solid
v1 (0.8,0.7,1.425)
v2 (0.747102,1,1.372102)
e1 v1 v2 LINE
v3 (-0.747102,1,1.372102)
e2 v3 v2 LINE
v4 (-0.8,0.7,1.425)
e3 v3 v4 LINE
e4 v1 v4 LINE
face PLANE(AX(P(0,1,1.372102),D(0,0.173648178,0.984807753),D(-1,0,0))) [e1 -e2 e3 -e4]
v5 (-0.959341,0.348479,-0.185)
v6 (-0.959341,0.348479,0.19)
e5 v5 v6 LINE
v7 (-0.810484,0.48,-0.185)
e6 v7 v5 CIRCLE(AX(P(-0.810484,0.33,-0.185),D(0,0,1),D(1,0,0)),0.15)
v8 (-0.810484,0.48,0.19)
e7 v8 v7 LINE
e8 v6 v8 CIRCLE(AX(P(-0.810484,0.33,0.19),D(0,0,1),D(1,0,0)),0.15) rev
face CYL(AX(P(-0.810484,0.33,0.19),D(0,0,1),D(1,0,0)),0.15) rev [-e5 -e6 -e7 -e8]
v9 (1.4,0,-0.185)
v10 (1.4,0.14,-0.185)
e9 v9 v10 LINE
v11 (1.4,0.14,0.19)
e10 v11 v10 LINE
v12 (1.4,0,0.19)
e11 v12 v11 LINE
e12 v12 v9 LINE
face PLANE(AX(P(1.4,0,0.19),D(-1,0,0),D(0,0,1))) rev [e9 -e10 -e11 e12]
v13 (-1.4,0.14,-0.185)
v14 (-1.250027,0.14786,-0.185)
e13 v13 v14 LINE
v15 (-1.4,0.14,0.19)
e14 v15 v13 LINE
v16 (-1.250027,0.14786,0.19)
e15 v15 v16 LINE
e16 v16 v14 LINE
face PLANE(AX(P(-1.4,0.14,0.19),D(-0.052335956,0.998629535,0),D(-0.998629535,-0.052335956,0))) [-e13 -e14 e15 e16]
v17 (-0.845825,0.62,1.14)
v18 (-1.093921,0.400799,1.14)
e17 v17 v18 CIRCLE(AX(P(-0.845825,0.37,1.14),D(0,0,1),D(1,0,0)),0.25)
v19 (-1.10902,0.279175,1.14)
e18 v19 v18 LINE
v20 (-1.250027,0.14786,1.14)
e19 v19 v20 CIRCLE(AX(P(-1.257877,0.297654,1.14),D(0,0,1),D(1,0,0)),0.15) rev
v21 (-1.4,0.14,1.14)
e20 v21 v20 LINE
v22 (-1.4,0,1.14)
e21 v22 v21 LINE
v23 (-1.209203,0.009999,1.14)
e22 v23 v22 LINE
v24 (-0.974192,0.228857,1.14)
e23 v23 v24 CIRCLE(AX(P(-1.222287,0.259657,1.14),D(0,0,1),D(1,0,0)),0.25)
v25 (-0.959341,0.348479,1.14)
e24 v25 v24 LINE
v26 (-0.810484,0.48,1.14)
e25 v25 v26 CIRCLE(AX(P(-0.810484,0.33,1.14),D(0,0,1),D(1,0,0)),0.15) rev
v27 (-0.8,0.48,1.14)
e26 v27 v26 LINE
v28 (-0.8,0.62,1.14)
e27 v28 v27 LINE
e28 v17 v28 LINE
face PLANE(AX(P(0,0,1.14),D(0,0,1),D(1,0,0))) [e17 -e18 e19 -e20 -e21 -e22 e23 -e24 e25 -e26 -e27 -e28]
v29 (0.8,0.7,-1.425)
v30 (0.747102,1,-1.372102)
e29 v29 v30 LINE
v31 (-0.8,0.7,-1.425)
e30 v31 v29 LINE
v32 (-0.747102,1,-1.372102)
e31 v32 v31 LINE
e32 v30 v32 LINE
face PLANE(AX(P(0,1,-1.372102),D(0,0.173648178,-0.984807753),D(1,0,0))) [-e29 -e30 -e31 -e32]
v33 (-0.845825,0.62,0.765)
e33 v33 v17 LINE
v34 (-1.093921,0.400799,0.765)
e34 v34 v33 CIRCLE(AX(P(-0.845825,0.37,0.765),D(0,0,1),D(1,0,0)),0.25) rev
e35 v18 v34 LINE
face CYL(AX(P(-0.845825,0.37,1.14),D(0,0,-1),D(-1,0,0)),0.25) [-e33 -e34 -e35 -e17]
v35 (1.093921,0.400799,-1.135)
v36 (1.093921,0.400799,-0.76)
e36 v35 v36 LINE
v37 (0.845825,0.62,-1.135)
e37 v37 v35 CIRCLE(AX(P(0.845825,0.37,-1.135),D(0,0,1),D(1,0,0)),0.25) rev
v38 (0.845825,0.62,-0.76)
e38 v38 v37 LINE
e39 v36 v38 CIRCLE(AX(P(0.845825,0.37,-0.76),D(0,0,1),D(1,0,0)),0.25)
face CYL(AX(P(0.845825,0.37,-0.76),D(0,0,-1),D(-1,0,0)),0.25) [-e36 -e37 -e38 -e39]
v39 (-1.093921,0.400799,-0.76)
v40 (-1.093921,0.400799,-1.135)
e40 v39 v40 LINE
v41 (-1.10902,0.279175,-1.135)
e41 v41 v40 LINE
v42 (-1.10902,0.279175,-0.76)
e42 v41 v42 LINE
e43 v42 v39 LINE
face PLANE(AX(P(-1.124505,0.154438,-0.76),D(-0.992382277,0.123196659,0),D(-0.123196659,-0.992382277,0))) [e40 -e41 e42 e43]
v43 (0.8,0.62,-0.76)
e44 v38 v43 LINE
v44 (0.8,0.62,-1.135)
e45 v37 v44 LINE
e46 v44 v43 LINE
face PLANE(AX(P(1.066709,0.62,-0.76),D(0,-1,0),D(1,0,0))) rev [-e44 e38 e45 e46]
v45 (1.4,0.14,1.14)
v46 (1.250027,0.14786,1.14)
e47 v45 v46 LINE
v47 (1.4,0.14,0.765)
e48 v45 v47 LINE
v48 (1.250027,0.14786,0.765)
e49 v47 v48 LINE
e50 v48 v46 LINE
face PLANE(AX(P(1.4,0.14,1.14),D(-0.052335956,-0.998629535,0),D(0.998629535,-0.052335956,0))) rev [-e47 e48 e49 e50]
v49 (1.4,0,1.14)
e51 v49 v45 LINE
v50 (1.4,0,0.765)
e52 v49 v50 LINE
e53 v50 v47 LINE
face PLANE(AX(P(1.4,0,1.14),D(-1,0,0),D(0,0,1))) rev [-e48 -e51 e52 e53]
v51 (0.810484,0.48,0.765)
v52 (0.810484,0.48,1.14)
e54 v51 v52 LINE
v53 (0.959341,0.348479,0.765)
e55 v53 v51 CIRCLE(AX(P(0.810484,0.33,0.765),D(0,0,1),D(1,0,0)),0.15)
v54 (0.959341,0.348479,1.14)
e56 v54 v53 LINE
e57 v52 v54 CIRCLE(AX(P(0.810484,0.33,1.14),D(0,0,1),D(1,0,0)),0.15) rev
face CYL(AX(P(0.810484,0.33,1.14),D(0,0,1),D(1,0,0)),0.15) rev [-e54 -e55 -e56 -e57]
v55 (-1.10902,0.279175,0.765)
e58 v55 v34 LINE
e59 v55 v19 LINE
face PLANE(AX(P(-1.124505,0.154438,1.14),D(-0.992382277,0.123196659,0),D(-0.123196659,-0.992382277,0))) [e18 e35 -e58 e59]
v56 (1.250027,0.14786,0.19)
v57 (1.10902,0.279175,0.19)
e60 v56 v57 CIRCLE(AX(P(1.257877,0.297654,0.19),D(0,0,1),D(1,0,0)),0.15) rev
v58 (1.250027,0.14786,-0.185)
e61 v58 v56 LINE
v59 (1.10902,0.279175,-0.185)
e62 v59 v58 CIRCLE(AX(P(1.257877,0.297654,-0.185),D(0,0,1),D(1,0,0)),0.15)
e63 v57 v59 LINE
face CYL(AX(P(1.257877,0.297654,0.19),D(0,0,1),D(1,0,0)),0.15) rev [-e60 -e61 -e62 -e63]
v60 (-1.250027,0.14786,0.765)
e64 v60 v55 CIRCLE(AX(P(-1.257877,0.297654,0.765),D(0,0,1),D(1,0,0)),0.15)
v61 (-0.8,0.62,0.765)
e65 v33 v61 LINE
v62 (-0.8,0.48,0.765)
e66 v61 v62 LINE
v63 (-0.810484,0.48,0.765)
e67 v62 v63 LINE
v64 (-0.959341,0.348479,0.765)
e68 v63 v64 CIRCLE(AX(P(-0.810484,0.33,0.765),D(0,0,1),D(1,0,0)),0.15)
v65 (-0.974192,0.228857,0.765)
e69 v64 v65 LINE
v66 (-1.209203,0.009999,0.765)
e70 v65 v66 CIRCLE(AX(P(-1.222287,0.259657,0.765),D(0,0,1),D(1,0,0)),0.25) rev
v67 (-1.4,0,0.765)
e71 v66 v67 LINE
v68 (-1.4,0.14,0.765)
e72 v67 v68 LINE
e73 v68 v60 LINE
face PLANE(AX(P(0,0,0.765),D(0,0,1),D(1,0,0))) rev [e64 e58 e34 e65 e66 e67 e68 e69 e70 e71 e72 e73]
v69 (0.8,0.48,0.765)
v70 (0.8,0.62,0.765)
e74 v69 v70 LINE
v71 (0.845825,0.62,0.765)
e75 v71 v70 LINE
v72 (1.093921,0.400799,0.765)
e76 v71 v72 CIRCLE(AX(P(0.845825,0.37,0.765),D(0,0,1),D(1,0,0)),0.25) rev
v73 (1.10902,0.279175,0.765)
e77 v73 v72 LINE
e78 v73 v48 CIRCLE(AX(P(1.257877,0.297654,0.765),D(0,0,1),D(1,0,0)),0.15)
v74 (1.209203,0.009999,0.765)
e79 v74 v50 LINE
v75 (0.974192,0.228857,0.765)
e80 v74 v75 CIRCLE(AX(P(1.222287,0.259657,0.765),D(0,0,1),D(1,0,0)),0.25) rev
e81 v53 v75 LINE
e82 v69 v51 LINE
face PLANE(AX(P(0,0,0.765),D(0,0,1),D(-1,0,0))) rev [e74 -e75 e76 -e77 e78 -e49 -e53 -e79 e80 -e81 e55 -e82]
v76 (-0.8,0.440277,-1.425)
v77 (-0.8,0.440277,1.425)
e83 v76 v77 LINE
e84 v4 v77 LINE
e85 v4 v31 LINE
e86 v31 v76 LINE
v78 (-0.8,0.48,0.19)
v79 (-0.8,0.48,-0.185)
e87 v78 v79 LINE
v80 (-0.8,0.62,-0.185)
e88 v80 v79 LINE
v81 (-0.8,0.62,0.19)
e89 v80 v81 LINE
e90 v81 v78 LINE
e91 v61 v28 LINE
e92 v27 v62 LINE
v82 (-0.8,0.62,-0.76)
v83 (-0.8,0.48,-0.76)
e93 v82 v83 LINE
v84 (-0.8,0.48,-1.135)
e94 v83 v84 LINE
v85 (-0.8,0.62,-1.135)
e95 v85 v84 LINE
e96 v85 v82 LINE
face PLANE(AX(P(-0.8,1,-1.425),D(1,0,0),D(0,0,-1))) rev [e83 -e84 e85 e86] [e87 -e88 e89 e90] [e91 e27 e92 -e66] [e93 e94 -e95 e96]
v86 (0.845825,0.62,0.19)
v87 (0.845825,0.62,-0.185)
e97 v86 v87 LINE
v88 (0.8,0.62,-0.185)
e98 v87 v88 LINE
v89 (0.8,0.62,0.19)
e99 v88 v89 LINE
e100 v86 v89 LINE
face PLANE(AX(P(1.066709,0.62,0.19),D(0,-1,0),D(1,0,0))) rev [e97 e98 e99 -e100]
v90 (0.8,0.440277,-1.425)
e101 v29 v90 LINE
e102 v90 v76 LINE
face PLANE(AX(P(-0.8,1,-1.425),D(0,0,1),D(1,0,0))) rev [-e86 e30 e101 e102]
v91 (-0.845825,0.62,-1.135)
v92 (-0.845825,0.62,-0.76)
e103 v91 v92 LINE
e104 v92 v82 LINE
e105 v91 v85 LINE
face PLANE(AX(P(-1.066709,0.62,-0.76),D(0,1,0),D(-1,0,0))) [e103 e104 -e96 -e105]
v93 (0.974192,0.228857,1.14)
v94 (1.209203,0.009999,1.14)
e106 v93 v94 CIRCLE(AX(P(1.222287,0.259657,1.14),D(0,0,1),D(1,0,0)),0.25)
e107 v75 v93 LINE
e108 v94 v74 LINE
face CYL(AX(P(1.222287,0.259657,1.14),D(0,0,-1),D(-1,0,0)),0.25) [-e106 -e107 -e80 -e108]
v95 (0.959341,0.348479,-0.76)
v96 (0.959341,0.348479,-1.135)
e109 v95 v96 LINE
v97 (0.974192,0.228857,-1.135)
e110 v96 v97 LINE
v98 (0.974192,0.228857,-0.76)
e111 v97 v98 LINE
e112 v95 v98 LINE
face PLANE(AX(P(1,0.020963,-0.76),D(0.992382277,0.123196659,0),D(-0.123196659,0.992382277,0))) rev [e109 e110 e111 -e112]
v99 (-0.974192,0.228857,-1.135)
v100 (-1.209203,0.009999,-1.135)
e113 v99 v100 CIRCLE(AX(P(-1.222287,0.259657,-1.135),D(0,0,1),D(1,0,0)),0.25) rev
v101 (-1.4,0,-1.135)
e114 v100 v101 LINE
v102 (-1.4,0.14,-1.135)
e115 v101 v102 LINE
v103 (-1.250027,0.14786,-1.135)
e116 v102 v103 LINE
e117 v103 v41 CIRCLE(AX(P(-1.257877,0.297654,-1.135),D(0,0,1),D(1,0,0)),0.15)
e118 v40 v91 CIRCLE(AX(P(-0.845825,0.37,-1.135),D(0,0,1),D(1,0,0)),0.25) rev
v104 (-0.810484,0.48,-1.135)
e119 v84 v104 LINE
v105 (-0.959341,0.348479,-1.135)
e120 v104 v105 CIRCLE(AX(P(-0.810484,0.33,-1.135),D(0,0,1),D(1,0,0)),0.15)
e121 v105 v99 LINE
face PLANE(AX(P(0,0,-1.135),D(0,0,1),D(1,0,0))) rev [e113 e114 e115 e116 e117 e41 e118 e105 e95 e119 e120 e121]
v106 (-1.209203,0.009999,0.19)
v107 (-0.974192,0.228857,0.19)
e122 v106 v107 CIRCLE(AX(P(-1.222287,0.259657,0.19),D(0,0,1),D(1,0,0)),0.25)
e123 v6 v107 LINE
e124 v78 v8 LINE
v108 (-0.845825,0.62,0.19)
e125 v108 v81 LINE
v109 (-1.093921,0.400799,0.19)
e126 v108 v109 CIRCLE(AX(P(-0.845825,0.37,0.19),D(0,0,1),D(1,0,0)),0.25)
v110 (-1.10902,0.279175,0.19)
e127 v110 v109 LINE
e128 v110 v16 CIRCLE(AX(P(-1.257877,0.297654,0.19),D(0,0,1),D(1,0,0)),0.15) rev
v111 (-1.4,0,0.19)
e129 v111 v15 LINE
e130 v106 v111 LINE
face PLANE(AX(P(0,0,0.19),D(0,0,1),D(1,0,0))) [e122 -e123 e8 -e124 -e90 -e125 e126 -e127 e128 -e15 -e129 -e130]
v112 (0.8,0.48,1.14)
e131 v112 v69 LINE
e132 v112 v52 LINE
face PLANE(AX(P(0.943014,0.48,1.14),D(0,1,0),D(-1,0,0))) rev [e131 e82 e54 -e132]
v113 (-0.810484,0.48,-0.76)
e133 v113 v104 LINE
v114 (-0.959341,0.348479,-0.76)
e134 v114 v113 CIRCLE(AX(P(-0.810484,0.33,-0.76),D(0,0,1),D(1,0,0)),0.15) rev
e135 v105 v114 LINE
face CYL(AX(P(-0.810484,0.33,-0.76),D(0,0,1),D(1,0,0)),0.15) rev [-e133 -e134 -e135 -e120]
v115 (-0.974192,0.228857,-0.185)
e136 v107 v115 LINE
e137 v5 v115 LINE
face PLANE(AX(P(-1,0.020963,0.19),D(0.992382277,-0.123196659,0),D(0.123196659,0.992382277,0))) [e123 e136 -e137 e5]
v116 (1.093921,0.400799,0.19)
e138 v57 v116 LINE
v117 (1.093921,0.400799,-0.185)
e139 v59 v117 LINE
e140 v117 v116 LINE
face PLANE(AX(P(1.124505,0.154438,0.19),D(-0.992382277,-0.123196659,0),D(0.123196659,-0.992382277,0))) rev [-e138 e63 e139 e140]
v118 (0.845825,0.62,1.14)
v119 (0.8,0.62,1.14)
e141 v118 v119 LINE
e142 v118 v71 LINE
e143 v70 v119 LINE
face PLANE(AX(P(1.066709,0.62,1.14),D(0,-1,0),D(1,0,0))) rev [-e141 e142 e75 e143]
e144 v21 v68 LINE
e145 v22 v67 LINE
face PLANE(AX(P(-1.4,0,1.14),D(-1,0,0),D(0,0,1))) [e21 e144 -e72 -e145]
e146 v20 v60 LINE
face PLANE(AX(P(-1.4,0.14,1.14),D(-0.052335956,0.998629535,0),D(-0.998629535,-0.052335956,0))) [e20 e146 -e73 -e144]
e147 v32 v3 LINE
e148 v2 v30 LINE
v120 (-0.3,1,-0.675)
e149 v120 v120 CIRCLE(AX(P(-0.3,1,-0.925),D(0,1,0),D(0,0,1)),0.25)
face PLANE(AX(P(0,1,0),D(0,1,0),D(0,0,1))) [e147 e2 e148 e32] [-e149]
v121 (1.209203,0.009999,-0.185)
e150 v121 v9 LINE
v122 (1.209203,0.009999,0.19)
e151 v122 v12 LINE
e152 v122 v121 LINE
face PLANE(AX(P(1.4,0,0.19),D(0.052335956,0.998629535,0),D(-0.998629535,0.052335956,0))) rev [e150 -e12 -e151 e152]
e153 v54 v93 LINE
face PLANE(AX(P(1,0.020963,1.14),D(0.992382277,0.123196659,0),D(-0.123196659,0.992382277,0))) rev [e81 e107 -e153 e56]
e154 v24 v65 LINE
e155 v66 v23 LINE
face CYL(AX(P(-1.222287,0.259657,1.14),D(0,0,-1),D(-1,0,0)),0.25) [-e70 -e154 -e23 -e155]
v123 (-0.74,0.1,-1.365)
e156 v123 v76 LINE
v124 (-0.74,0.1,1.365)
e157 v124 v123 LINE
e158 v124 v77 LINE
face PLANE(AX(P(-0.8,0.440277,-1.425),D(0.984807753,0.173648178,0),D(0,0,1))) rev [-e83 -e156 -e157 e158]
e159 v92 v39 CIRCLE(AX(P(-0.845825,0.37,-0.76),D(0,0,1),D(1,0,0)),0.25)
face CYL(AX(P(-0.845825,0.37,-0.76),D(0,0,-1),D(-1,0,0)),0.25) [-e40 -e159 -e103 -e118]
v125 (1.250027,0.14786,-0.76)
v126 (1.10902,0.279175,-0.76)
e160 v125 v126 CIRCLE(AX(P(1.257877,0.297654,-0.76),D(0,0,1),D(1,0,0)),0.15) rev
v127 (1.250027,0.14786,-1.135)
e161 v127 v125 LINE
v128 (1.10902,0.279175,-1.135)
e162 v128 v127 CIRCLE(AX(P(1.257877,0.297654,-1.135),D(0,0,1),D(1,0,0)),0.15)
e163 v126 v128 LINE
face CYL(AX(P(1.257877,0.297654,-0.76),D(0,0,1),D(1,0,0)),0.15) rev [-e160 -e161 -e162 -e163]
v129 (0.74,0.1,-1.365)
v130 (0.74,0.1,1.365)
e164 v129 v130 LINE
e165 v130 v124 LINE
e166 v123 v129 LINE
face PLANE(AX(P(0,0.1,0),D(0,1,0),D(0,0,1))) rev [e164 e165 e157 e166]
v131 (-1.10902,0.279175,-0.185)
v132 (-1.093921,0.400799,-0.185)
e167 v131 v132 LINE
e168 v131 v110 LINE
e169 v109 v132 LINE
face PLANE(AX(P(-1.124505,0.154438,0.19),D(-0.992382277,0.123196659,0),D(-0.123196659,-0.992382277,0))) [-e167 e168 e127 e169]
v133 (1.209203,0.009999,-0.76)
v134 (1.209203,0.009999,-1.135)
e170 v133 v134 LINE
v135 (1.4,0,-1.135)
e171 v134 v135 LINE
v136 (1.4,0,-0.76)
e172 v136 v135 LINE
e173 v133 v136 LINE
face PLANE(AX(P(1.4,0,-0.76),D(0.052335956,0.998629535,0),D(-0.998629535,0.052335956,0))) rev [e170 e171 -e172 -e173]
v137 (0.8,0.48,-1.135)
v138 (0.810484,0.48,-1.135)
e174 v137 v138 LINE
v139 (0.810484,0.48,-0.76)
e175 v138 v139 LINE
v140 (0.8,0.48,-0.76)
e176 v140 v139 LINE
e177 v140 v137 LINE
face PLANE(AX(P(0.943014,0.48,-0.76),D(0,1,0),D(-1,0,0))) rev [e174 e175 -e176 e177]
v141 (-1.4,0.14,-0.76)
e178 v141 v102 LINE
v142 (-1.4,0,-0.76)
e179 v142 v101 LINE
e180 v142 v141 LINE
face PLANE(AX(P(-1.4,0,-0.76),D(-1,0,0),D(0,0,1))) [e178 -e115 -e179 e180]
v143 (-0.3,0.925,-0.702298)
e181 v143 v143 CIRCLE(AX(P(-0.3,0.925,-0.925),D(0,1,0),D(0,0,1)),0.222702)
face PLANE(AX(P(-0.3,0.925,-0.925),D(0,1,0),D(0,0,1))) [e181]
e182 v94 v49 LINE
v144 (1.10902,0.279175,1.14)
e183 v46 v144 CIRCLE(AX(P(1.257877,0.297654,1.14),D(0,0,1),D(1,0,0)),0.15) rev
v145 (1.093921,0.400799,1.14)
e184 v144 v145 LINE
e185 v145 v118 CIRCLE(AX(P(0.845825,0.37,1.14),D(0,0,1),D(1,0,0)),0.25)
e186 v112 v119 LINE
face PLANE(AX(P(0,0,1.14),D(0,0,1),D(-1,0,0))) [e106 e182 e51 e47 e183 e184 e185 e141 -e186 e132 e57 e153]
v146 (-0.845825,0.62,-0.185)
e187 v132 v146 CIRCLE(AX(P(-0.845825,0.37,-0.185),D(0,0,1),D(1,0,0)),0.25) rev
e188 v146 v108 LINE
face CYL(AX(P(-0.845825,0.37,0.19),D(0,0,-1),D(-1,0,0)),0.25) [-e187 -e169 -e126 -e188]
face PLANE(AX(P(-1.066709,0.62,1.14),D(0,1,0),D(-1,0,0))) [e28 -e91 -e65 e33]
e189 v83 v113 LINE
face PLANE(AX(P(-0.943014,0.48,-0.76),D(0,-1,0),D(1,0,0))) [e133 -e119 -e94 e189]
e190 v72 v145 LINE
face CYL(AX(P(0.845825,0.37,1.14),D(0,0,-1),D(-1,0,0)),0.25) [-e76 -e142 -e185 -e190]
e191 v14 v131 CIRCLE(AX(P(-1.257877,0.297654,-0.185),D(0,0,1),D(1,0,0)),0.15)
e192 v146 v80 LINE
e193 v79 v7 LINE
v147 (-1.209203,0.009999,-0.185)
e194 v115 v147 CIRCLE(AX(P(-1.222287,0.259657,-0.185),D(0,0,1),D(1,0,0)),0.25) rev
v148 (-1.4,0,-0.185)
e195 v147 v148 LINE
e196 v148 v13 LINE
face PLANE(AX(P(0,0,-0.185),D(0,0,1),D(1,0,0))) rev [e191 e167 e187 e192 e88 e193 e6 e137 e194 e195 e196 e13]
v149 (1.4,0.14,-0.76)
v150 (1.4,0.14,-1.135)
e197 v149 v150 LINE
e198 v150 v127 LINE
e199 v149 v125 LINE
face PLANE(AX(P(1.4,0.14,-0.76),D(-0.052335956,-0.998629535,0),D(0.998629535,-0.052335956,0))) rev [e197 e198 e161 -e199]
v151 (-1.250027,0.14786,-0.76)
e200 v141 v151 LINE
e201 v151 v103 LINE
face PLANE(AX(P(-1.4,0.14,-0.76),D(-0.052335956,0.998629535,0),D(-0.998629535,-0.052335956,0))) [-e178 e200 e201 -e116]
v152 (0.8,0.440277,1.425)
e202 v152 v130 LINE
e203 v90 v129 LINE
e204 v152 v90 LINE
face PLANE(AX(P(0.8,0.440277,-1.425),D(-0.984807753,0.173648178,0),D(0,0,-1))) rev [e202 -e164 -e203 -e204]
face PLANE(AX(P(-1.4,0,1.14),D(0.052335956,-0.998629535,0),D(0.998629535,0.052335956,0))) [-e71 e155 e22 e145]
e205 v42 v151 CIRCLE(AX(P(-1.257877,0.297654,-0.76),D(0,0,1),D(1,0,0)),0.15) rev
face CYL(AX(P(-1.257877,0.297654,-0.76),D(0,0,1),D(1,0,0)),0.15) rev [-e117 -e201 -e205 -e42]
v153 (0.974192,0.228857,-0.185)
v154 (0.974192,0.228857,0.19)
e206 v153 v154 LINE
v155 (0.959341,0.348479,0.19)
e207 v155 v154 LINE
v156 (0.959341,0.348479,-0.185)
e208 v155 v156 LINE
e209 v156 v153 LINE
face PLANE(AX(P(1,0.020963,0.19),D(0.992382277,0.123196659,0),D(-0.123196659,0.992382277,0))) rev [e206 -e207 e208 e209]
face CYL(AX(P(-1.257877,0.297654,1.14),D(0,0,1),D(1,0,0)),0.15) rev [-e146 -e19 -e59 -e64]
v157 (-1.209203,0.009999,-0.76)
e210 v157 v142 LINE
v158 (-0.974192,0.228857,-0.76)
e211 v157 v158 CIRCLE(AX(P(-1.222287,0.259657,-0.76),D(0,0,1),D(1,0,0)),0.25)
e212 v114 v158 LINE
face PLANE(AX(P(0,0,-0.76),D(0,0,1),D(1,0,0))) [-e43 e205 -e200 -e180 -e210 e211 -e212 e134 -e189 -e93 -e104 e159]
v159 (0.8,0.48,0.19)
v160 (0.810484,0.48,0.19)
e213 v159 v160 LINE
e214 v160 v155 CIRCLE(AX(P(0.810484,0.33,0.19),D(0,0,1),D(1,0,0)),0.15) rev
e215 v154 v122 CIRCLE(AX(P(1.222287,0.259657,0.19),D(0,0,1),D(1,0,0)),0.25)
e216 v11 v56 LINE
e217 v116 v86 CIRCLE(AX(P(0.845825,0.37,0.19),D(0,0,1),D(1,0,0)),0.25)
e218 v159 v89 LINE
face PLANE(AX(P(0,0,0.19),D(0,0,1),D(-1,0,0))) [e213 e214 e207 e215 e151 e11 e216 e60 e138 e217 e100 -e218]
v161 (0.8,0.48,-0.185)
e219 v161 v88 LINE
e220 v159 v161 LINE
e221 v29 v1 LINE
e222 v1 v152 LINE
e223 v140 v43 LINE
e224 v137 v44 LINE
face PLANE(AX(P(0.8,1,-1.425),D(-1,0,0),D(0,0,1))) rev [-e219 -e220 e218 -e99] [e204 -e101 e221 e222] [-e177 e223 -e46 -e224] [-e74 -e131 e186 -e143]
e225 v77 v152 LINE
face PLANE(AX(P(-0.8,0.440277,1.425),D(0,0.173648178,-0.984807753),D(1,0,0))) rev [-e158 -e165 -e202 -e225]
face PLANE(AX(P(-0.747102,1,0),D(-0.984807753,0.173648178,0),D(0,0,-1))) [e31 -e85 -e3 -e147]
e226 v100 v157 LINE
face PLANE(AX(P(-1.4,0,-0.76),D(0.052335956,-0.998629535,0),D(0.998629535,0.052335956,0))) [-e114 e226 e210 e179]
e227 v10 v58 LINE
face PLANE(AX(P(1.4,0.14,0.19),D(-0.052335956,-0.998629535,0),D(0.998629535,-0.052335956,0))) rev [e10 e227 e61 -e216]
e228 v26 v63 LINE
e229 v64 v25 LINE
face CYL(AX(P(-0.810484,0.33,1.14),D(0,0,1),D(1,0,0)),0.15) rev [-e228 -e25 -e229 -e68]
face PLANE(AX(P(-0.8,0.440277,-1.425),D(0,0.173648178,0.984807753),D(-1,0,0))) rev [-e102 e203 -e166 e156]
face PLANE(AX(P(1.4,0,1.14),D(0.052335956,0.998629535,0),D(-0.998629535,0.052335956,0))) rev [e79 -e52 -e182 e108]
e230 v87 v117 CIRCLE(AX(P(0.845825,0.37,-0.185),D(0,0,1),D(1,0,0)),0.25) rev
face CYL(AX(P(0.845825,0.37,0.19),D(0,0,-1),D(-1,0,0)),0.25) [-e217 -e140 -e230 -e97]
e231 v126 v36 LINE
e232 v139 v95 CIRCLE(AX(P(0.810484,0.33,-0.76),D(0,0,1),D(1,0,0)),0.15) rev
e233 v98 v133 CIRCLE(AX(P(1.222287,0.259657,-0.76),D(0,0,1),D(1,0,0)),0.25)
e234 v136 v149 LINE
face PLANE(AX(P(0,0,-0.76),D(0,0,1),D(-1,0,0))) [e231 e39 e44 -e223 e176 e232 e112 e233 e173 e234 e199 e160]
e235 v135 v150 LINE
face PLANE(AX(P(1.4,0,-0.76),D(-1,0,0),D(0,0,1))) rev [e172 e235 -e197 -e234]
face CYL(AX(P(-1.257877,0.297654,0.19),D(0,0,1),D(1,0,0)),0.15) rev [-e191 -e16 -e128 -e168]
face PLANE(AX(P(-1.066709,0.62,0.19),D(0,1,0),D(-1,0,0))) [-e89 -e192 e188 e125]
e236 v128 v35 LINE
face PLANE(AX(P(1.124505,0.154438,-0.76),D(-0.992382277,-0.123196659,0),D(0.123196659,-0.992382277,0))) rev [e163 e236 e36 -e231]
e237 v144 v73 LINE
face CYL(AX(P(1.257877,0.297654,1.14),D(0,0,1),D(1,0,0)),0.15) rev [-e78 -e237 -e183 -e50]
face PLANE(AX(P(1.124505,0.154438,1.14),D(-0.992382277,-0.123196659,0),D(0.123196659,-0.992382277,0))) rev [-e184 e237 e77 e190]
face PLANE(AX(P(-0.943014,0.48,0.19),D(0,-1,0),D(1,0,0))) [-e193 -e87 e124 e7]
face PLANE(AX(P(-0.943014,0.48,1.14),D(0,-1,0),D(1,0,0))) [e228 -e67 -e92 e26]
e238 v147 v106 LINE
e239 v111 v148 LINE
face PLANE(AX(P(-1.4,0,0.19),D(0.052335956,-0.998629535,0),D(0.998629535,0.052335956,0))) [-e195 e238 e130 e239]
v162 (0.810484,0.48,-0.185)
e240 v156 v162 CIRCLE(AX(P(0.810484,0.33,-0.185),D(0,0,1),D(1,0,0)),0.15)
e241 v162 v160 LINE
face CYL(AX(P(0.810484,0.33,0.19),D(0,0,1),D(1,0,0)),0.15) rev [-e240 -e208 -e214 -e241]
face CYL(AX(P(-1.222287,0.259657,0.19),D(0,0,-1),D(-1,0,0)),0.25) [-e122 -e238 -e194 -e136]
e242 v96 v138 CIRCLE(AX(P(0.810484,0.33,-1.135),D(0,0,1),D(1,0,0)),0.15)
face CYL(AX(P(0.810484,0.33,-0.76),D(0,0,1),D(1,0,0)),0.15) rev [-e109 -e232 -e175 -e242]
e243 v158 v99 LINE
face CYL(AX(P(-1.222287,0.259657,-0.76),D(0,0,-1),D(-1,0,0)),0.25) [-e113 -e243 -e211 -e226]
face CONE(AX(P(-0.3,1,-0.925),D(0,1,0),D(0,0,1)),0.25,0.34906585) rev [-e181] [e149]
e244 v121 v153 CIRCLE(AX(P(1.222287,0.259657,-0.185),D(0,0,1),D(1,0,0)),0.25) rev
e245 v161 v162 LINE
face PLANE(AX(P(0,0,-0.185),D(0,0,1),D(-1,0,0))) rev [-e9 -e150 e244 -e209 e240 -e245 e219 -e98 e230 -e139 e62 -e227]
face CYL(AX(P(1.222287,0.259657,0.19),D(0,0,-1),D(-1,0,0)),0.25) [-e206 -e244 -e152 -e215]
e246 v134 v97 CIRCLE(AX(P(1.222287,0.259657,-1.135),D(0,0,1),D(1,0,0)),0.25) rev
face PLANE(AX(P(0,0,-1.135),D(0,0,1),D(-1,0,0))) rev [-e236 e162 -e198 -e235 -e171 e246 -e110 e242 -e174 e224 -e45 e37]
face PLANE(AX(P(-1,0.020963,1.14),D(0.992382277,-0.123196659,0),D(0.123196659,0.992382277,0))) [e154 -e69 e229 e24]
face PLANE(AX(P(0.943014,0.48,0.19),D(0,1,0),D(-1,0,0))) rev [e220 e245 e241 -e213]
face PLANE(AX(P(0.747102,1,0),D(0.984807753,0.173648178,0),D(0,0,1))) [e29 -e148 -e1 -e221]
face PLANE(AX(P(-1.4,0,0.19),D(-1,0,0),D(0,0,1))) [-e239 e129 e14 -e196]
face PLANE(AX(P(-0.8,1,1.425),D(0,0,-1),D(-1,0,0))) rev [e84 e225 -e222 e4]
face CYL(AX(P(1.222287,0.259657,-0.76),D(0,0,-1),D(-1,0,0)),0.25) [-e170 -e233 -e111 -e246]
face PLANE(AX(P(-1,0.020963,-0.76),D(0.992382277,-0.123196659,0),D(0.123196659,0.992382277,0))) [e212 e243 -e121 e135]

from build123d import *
from OCP.BRepFilletAPI import BRepFilletAPI_MakeChamfer

# Parameters (mm, degrees)
SKETCH1_W            = 1.6
SKETCH1_H            = 2.85
BOSS_EXTRUDE1_DEPTH  = 0.9
CHAMFER1_SIZE        = 0.06
CHAMFER1_SIZE2       = 0.340276909
CHAMFER2_SIZE        = 0.3
CHAMFER2_SIZE2       = 0.052898094
SKETCH3_R            = 0.25
MARK_PIN1_DEPTH      = 0.075
MARK_PIN1_DRAFT      = -20
PIN_EXTRUDE_DEPTH    = 0.375
FILLET1_R            = 0.15
FILLET2_R            = 0.25
FILLET1_OF_MIRROR1_R = 0.15
FILLET2_OF_MIRROR1_R = 0.25
PIN_PATTERN_START    = -0.185
PIN_PATTERN_DEPTH    = 0.375
PIN_PATTERN_START_2  = 0.765
PIN_PATTERN_2_DEPTH  = 0.375


# Read off the part's stored shape, not the designer's step: pin_pattern
with BuildPart() as part:
    # Sketch1 → Boss-Extrude1 (new body)
    with BuildSketch(Plane(origin=(0, 0.1, 0), x_dir=(1, 0, 0), z_dir=(0, 1, 0))):
        Rectangle(SKETCH1_W, SKETCH1_H)
    extrude(amount=BOSS_EXTRUDE1_DEPTH)

    # Chamfer1
    chamfer1_edges = [part.edges().sort_by_distance(p)[0] for p in [
        (0, 0.1, 1.425),
        (-0.8, 0.1, 0),
        (0, 0.1, -1.425),
        (0.8, 0.1, 0),
    ]]
    chamfer1_side = [part.faces().sort_by_distance(p)[0] for p in [
        (0, 0.1, 0),
    ]]
    chamfer(chamfer1_edges, length=CHAMFER1_SIZE, length2=CHAMFER1_SIZE2, reference=chamfer1_side[0])

    # Chamfer2: one chamfer whose edges measure the first distance from different faces: ONE call of the kernel's chamfer builder (chamfer() names one face for all edges)
    chamfer2_edges_1 = [part.edges().sort_by_distance(p)[0] for p in [
        (-0.8, 1, 0),
    ]]
    chamfer2_side_1 = [part.faces().sort_by_distance(p)[0] for p in [
        (-0.8, 0.720138455, 0),
    ]]
    chamfer2_edges_2 = [part.edges().sort_by_distance(p)[0] for p in [
        (0, 1, 1.425),
    ]]
    chamfer2_side_2 = [part.faces().sort_by_distance(p)[0] for p in [
        (0, 0.720138455, 1.425),
    ]]
    chamfer2_edges_3 = [part.edges().sort_by_distance(p)[0] for p in [
        (0.8, 1, 0),
    ]]
    chamfer2_side_3 = [part.faces().sort_by_distance(p)[0] for p in [
        (0.8, 0.720138455, 0),
    ]]
    chamfer2_edges_4 = [part.edges().sort_by_distance(p)[0] for p in [
        (0, 1, -1.425),
    ]]
    chamfer2_side_4 = [part.faces().sort_by_distance(p)[0] for p in [
        (0, 0.720138455, -1.425),
    ]]
    chamfer2 = BRepFilletAPI_MakeChamfer(part.part.solid().wrapped)
    for e in chamfer2_edges_1:
        chamfer2.Add(CHAMFER2_SIZE, CHAMFER2_SIZE2, e.wrapped, chamfer2_side_1[0].wrapped)  # the first distance lies on this face
    for e in chamfer2_edges_2:
        chamfer2.Add(CHAMFER2_SIZE, CHAMFER2_SIZE2, e.wrapped, chamfer2_side_2[0].wrapped)  # the first distance lies on this face
    for e in chamfer2_edges_3:
        chamfer2.Add(CHAMFER2_SIZE, CHAMFER2_SIZE2, e.wrapped, chamfer2_side_3[0].wrapped)  # the first distance lies on this face
    for e in chamfer2_edges_4:
        chamfer2.Add(CHAMFER2_SIZE, CHAMFER2_SIZE2, e.wrapped, chamfer2_side_4[0].wrapped)  # the first distance lies on this face
    add(Compound.cast(chamfer2.Shape()), mode=Mode.REPLACE)


with BuildPart() as mark_pin1_tool:
    # Sketch3 → mark pin1 (with draft: the straight prism first)
    with BuildSketch(Plane(origin=(0, 1, 0), x_dir=(1, 0, 0), z_dir=(0, 1, 0))):
        with Locations((-0.3, 0.925)):
            Circle(SKETCH3_R)
    extrude(amount=-MARK_PIN1_DEPTH)
    # mark pin1: the draft: its side faces are tilted about the plane it starts from
    mark_pin1_sides = [mark_pin1_tool.faces().sort_by_distance(p)[0] for p in [
        (-0.55, 0.9625, -0.925),
    ]]
    draft(mark_pin1_sides, Plane(origin=(0, 1, 0), x_dir=(1, 0, 0), z_dir=(0, 1, 0)), MARK_PIN1_DRAFT)


with BuildPart() as part_1:
    add(part.part)

    # mark pin1: cut by mark_pin1_tool
    add(mark_pin1_tool.part, mode=Mode.SUBTRACT)

    # Sketch2 → pin extrude (add)
    with BuildSketch(Plane(origin=(0, 0, -1.135), x_dir=(-1, 0, 0), z_dir=(0, 0, -1))):
        Polygon((1.4, 0), (1.4, 0.14), (1.124504771, 0.154438093), (1.066708826, 0.62), (0, 0.62), (0, 0.48), (0.943014086, 0.48), (1, 0.020963112), align=None)
    pin_extrude = extrude(amount=-PIN_EXTRUDE_DEPTH)

    # Fillet1
    fillet1_edges = [part_1.edges().sort_by_distance(p)[0] for p in [
        (-0.943014086, 0.48, -0.9475),
        (-1.124504771, 0.154438093, -0.9475),
    ]]
    fillet(fillet1_edges, radius=FILLET1_R)

    # Fillet2
    fillet2_edges = [part_1.edges().sort_by_distance(p)[0] for p in [
        (-1, 0.020963112, -0.9475),
        (-1.066708826, 0.62, -0.9475),
    ]]
    fillet(fillet2_edges, radius=FILLET2_R)

    # Mirror1: pin extrude across plane
    add(pin_extrude.mirror(Plane(origin=(0, 0, 0), x_dir=(0, 0, 1), z_dir=(1, 0, 0))))

    # Fillet1 of Mirror1
    fillet1_of_mirror1_edges = [part_1.edges().sort_by_distance(p)[0] for p in [
        (0.943014086, 0.48, -0.9475),
        (1.124504771, 0.154438093, -0.9475),
    ]]
    fillet(fillet1_of_mirror1_edges, radius=FILLET1_OF_MIRROR1_R)

    # Fillet2 of Mirror1
    fillet2_of_mirror1_edges = [part_1.edges().sort_by_distance(p)[0] for p in [
        (1, 0.020963112, -0.9475),
        (1.066708826, 0.62, -0.9475),
    ]]
    fillet(fillet2_of_mirror1_edges, radius=FILLET2_OF_MIRROR1_R)

    # pin_pattern outline → pin_pattern (add)
    with BuildSketch(Plane.XY.offset(PIN_PATTERN_START)):
        with BuildLine():
            Line((0.8, 0.48), (0.810484007, 0.48))
            ThreePointArc((0.810484007, 0.48), (0.909801869, 0.442409797), (0.959341349, 0.348479499))
            Line((0.959341349, 0.348479499), (0.974191509, 0.228857461))
            ThreePointArc((0.974191509, 0.228857461), (1.05190979, 0.076704229), (1.209203089, 0.009999242))
            Line((1.209203089, 0.009999242), (1.4, 0))
            Line((1.4, 0), (1.4, 0.14))
            Line((1.4, 0.14), (1.250026624, 0.147859772))
            ThreePointArc((1.250026624, 0.147859772), (1.155650645, 0.187882764), (1.109019676, 0.279174703))
            Line((1.109019676, 0.279174703), (1.093920931, 0.400799165))
            ThreePointArc((1.093920931, 0.400799165), (1.011355131, 0.557349661), (0.845825362, 0.62))
            Line((0.845825362, 0.62), (0.8, 0.62))
            Line((0.8, 0.62), (0.8, 0.48))
        make_face()
        with BuildLine():
            ThreePointArc((-0.959341349, 0.348479499), (-0.909801869, 0.442409797), (-0.810484007, 0.48))
            Line((-0.810484007, 0.48), (-0.8, 0.48))
            Line((-0.8, 0.48), (-0.8, 0.62))
            Line((-0.8, 0.62), (-0.845825362, 0.62))
            ThreePointArc((-0.845825362, 0.62), (-1.011355131, 0.557349661), (-1.093920931, 0.400799165))
            Line((-1.093920931, 0.400799165), (-1.109019676, 0.279174703))
            ThreePointArc((-1.109019676, 0.279174703), (-1.155650645, 0.187882764), (-1.250026624, 0.147859772))
            Line((-1.250026624, 0.147859772), (-1.4, 0.14))
            Line((-1.4, 0.14), (-1.4, 0))
            Line((-1.4, 0), (-1.209203089, 0.009999242))
            ThreePointArc((-1.209203089, 0.009999242), (-1.05190979, 0.076704229), (-0.974191509, 0.228857461))
            Line((-0.974191509, 0.228857461), (-0.959341349, 0.348479499))
        make_face()
    extrude(amount=PIN_PATTERN_DEPTH)

    # pin_pattern 2 outline → pin_pattern 2 (add)
    with BuildSketch(Plane.XY.offset(PIN_PATTERN_START_2)):
        with BuildLine():
            Line((0.8, 0.48), (0.810484007, 0.48))
            ThreePointArc((0.810484007, 0.48), (0.909801869, 0.442409797), (0.959341349, 0.348479499))
            Line((0.959341349, 0.348479499), (0.974191509, 0.228857461))
            ThreePointArc((0.974191509, 0.228857461), (1.05190979, 0.076704229), (1.209203089, 0.009999242))
            Line((1.209203089, 0.009999242), (1.4, 0))
            Line((1.4, 0), (1.4, 0.14))
            Line((1.4, 0.14), (1.250026624, 0.147859772))
            ThreePointArc((1.250026624, 0.147859772), (1.155650645, 0.187882764), (1.109019676, 0.279174703))
            Line((1.109019676, 0.279174703), (1.093920931, 0.400799165))
            ThreePointArc((1.093920931, 0.400799165), (1.011355131, 0.557349661), (0.845825362, 0.62))
            Line((0.845825362, 0.62), (0.8, 0.62))
            Line((0.8, 0.62), (0.8, 0.48))
        make_face()
        with BuildLine():
            ThreePointArc((-0.959341349, 0.348479499), (-0.909801869, 0.442409797), (-0.810484007, 0.48))
            Line((-0.810484007, 0.48), (-0.8, 0.48))
            Line((-0.8, 0.48), (-0.8, 0.62))
            Line((-0.8, 0.62), (-0.845825362, 0.62))
            ThreePointArc((-0.845825362, 0.62), (-1.011355131, 0.557349661), (-1.093920931, 0.400799165))
            Line((-1.093920931, 0.400799165), (-1.109019676, 0.279174703))
            ThreePointArc((-1.109019676, 0.279174703), (-1.155650645, 0.187882764), (-1.250026624, 0.147859772))
            Line((-1.250026624, 0.147859772), (-1.4, 0.14))
            Line((-1.4, 0.14), (-1.4, 0))
            Line((-1.4, 0), (-1.209203089, 0.009999242))
            ThreePointArc((-1.209203089, 0.009999242), (-1.05190979, 0.076704229), (-0.974191509, 0.228857461))
            Line((-0.974191509, 0.228857461), (-0.959341349, 0.348479499))
        make_face()
    extrude(amount=PIN_PATTERN_2_DEPTH)


solid = part_1.part
